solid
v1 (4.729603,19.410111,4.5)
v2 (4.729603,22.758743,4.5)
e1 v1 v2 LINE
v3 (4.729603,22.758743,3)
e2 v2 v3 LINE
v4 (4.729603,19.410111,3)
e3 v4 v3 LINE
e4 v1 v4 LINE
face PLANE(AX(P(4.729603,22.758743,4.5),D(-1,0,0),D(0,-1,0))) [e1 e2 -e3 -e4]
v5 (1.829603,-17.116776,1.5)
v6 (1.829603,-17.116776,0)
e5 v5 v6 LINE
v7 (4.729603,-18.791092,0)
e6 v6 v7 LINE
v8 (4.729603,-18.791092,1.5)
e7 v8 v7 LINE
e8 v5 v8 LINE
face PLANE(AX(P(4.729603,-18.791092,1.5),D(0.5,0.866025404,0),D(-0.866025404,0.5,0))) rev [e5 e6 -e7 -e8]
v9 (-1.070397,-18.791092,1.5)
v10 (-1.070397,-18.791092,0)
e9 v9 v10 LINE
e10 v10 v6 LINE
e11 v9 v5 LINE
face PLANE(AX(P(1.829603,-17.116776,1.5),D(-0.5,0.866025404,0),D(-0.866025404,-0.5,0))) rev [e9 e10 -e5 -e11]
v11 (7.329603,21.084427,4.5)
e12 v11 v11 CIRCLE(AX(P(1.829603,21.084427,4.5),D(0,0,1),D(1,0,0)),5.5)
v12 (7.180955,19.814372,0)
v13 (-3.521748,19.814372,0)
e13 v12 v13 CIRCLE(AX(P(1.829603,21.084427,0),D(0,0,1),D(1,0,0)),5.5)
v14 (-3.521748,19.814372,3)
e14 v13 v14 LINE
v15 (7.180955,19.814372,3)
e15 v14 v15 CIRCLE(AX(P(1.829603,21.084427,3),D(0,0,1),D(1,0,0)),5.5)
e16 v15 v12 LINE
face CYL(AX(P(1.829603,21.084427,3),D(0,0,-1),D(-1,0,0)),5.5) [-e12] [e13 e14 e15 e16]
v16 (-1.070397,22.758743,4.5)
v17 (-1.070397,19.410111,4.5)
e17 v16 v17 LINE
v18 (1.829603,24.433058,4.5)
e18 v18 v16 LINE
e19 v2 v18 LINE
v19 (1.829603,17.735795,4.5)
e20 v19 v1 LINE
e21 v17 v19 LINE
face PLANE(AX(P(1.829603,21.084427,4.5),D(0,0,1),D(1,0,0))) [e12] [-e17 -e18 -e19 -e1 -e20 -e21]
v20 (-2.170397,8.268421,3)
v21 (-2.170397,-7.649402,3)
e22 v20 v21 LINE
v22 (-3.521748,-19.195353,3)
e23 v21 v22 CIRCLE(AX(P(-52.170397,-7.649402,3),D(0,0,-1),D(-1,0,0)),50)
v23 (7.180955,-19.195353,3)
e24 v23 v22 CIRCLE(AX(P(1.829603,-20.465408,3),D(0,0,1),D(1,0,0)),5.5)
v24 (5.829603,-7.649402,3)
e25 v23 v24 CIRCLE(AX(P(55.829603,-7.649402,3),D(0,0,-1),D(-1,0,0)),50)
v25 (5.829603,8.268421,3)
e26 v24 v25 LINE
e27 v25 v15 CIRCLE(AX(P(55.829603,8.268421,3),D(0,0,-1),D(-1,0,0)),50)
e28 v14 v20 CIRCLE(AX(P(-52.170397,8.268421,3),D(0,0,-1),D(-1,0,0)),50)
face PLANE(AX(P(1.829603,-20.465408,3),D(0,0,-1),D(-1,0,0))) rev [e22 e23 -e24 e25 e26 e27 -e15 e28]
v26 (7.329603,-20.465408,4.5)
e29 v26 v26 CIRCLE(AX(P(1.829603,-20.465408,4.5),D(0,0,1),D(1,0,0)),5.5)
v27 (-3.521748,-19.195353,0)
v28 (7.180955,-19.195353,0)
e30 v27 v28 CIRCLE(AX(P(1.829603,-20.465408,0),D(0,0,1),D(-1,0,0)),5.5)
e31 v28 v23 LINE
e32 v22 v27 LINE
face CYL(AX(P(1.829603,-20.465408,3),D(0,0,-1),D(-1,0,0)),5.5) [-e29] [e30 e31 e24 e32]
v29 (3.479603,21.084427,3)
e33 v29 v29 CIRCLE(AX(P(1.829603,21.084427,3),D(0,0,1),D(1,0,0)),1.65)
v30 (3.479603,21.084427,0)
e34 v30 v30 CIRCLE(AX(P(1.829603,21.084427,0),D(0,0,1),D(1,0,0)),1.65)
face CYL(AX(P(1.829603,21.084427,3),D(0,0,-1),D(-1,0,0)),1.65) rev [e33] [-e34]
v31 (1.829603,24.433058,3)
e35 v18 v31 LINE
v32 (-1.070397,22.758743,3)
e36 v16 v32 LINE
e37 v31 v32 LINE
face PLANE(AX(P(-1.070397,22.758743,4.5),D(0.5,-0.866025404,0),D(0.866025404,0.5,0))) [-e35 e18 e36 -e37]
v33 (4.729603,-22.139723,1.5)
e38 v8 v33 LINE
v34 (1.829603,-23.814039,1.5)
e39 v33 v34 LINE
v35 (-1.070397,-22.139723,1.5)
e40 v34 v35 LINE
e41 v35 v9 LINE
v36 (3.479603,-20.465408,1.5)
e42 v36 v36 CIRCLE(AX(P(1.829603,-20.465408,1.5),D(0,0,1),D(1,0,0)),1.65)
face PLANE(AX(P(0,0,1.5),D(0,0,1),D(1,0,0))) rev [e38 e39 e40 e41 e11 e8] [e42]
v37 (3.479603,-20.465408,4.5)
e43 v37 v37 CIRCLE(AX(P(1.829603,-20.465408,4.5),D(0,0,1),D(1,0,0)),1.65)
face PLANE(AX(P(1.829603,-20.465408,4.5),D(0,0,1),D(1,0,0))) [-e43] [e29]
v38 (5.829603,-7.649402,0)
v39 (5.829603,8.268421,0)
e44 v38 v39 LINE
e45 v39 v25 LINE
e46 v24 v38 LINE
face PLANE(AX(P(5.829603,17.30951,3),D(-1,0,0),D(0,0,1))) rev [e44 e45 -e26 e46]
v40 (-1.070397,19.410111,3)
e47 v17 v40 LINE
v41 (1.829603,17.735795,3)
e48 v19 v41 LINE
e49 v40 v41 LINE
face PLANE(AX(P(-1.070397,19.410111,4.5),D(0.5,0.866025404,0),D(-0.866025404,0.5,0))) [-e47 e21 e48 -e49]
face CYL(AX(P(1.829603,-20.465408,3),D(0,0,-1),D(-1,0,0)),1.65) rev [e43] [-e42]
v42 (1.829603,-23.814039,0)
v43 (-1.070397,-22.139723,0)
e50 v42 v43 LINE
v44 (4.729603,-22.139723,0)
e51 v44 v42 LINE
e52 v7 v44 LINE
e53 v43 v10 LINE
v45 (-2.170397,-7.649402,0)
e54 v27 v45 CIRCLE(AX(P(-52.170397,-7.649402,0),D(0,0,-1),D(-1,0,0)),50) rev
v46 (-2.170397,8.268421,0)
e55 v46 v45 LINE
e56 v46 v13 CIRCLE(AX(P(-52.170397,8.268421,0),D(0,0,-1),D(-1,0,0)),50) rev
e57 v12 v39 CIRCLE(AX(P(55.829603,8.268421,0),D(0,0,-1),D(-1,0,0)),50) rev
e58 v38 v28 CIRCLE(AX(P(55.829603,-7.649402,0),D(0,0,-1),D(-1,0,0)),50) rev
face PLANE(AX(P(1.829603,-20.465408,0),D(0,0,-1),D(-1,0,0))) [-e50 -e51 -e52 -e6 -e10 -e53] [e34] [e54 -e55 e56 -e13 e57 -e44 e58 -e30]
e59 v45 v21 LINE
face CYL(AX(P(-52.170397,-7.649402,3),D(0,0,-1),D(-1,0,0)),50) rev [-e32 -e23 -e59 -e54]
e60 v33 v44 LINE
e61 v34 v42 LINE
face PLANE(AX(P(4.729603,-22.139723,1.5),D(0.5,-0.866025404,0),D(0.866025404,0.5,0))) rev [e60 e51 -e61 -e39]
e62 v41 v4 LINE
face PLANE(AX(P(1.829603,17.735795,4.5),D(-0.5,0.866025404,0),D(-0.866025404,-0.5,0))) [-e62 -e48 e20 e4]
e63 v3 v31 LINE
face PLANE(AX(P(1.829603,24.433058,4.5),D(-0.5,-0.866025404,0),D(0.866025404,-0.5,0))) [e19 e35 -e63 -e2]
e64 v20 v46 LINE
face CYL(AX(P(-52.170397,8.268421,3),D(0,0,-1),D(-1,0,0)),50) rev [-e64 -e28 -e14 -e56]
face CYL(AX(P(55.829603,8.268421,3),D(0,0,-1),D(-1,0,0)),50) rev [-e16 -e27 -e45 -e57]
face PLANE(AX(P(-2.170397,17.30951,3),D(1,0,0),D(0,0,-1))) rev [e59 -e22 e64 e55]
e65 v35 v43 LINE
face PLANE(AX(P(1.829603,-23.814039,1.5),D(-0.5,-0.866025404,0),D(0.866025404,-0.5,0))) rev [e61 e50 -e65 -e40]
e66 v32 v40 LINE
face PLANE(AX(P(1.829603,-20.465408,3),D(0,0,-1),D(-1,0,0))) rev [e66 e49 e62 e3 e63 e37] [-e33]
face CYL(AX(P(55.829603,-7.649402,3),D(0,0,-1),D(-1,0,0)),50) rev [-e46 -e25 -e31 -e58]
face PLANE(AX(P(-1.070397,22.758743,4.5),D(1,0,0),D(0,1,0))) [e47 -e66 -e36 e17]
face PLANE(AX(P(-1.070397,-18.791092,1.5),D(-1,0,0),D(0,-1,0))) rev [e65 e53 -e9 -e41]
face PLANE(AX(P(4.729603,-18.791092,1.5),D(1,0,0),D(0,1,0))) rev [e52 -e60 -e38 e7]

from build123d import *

# Parameters (mm, degrees)
SKETCH_1_R          = 1.65
EXTRUDE_1_DEPTH     = 3
SKETCH_2_R          = 5.5
SKETCH_2_R_2        = 1.65
EXTRUDE_2_DEPTH     = 1.5
FILLET_2_R          = 50
CUT_EXTRUDE_1_DEPTH = 1.5


with BuildPart() as part:
    # 草图1 → 凸台-拉伸1 (new body)
    with BuildSketch(Plane.XY):
        with BuildLine():
            Line((-2.170396733, 17.309509621), (-2.170396733, -16.690490379))
            ThreePointArc((-2.170396733, -16.690490379), (1.829603267, -25.965407597), (5.829603267, -16.690490379))
            Line((5.829603267, -16.690490379), (5.829603267, 17.309509621))
            ThreePointArc((5.829603267, 17.309509621), (1.829603267, 26.584426838), (-2.170396733, 17.309509621))
        make_face()
        with Locations((1.829603267, 21.084426838)):
            Circle(SKETCH_1_R, mode=Mode.SUBTRACT)
        with Locations((1.829603267, -20.465407597)):
            Circle(SKETCH_1_R, mode=Mode.SUBTRACT)
    extrude(amount=EXTRUDE_1_DEPTH)

    # 草图2 → 凸台-拉伸2 (add)
    # profile 1 of 2: a face of its own
    with BuildSketch(Plane.XY.offset(3)):
        with Locations(Location((1.829603267, 21.084426838, 0), (0, 0, 223.341758227))):
            Circle(SKETCH_2_R)
        Polygon((-1.070396733, 22.758742619), (-1.070396733, 19.410111058), (1.829603267, 17.735795277), (4.729603267, 19.410111058), (4.729603267, 22.758742619), (1.829603267, 24.433058399), align=None, mode=Mode.SUBTRACT)
    # profile 2 of 2: a face of its own
    with BuildSketch(Plane.XY.offset(3)):
        with Locations(Location((1.829603267, -20.465407597, 0), (0, 0, 136.658241773))):
            Circle(SKETCH_2_R)
        with Locations((1.829603267, -20.465407597)):
            Circle(SKETCH_2_R_2, mode=Mode.SUBTRACT)
    extrude(amount=EXTRUDE_2_DEPTH)

    # 圆角2
    # the kernel refuses this fillet: 50 mm, written as the material it adds along each edge
    with BuildSketch(Plane(origin=(-2.170396733, -16.690490379, 0), x_dir=(0, 1, 0), z_dir=(0, 0, 1)), Plane(origin=(5.829603267, 17.309509621, 0), x_dir=(0, -1, 0), z_dir=(0, 0, 1))) as fillet_2_piece_1:
        with BuildLine():
            CenterArc((9.0410884, 50), FILLET_2_R, 256.648815668, 13.351184332)
            ThreePointArc((-2.504862607, 1.351351351), (-1.163505185, 0.840508981), (0, 0))
            Line((0, 0), (9.0410884, 0))
        make_face()
    extrude(amount=3)
    with BuildSketch(Plane(origin=(-2.170396733, 17.309509621, 0), x_dir=(0, -1, 0), z_dir=(0, 0, 1)), Plane(origin=(5.829603267, -16.690490379, 0), x_dir=(0, 1, 0), z_dir=(0, 0, 1))) as fillet_2_piece_2:
        with BuildLine():
            CenterArc((9.0410884, -50), FILLET_2_R, 90, 13.351184332)
            ThreePointArc((-2.504862607, -1.351351351), (-1.163505185, -0.840508981), (0, 0))
            Line((0, 0), (9.0410884, 0))
        make_face()
    extrude(amount=3)

    # 草图5 → 切除-拉伸1 (cut)
    with BuildSketch(Plane(origin=(0, 0, 0), x_dir=(-1, 0, 0), z_dir=(0, 0, -1))):
        Polygon((-4.729603267, -18.791091816), (-4.729603267, -22.139723378), (-1.829603267, -23.814039158), (1.070396733, -22.139723378), (1.070396733, -18.791091816), (-1.829603267, -17.116776036), align=None)
    extrude(amount=-CUT_EXTRUDE_1_DEPTH, mode=Mode.SUBTRACT)


solid = part.part
